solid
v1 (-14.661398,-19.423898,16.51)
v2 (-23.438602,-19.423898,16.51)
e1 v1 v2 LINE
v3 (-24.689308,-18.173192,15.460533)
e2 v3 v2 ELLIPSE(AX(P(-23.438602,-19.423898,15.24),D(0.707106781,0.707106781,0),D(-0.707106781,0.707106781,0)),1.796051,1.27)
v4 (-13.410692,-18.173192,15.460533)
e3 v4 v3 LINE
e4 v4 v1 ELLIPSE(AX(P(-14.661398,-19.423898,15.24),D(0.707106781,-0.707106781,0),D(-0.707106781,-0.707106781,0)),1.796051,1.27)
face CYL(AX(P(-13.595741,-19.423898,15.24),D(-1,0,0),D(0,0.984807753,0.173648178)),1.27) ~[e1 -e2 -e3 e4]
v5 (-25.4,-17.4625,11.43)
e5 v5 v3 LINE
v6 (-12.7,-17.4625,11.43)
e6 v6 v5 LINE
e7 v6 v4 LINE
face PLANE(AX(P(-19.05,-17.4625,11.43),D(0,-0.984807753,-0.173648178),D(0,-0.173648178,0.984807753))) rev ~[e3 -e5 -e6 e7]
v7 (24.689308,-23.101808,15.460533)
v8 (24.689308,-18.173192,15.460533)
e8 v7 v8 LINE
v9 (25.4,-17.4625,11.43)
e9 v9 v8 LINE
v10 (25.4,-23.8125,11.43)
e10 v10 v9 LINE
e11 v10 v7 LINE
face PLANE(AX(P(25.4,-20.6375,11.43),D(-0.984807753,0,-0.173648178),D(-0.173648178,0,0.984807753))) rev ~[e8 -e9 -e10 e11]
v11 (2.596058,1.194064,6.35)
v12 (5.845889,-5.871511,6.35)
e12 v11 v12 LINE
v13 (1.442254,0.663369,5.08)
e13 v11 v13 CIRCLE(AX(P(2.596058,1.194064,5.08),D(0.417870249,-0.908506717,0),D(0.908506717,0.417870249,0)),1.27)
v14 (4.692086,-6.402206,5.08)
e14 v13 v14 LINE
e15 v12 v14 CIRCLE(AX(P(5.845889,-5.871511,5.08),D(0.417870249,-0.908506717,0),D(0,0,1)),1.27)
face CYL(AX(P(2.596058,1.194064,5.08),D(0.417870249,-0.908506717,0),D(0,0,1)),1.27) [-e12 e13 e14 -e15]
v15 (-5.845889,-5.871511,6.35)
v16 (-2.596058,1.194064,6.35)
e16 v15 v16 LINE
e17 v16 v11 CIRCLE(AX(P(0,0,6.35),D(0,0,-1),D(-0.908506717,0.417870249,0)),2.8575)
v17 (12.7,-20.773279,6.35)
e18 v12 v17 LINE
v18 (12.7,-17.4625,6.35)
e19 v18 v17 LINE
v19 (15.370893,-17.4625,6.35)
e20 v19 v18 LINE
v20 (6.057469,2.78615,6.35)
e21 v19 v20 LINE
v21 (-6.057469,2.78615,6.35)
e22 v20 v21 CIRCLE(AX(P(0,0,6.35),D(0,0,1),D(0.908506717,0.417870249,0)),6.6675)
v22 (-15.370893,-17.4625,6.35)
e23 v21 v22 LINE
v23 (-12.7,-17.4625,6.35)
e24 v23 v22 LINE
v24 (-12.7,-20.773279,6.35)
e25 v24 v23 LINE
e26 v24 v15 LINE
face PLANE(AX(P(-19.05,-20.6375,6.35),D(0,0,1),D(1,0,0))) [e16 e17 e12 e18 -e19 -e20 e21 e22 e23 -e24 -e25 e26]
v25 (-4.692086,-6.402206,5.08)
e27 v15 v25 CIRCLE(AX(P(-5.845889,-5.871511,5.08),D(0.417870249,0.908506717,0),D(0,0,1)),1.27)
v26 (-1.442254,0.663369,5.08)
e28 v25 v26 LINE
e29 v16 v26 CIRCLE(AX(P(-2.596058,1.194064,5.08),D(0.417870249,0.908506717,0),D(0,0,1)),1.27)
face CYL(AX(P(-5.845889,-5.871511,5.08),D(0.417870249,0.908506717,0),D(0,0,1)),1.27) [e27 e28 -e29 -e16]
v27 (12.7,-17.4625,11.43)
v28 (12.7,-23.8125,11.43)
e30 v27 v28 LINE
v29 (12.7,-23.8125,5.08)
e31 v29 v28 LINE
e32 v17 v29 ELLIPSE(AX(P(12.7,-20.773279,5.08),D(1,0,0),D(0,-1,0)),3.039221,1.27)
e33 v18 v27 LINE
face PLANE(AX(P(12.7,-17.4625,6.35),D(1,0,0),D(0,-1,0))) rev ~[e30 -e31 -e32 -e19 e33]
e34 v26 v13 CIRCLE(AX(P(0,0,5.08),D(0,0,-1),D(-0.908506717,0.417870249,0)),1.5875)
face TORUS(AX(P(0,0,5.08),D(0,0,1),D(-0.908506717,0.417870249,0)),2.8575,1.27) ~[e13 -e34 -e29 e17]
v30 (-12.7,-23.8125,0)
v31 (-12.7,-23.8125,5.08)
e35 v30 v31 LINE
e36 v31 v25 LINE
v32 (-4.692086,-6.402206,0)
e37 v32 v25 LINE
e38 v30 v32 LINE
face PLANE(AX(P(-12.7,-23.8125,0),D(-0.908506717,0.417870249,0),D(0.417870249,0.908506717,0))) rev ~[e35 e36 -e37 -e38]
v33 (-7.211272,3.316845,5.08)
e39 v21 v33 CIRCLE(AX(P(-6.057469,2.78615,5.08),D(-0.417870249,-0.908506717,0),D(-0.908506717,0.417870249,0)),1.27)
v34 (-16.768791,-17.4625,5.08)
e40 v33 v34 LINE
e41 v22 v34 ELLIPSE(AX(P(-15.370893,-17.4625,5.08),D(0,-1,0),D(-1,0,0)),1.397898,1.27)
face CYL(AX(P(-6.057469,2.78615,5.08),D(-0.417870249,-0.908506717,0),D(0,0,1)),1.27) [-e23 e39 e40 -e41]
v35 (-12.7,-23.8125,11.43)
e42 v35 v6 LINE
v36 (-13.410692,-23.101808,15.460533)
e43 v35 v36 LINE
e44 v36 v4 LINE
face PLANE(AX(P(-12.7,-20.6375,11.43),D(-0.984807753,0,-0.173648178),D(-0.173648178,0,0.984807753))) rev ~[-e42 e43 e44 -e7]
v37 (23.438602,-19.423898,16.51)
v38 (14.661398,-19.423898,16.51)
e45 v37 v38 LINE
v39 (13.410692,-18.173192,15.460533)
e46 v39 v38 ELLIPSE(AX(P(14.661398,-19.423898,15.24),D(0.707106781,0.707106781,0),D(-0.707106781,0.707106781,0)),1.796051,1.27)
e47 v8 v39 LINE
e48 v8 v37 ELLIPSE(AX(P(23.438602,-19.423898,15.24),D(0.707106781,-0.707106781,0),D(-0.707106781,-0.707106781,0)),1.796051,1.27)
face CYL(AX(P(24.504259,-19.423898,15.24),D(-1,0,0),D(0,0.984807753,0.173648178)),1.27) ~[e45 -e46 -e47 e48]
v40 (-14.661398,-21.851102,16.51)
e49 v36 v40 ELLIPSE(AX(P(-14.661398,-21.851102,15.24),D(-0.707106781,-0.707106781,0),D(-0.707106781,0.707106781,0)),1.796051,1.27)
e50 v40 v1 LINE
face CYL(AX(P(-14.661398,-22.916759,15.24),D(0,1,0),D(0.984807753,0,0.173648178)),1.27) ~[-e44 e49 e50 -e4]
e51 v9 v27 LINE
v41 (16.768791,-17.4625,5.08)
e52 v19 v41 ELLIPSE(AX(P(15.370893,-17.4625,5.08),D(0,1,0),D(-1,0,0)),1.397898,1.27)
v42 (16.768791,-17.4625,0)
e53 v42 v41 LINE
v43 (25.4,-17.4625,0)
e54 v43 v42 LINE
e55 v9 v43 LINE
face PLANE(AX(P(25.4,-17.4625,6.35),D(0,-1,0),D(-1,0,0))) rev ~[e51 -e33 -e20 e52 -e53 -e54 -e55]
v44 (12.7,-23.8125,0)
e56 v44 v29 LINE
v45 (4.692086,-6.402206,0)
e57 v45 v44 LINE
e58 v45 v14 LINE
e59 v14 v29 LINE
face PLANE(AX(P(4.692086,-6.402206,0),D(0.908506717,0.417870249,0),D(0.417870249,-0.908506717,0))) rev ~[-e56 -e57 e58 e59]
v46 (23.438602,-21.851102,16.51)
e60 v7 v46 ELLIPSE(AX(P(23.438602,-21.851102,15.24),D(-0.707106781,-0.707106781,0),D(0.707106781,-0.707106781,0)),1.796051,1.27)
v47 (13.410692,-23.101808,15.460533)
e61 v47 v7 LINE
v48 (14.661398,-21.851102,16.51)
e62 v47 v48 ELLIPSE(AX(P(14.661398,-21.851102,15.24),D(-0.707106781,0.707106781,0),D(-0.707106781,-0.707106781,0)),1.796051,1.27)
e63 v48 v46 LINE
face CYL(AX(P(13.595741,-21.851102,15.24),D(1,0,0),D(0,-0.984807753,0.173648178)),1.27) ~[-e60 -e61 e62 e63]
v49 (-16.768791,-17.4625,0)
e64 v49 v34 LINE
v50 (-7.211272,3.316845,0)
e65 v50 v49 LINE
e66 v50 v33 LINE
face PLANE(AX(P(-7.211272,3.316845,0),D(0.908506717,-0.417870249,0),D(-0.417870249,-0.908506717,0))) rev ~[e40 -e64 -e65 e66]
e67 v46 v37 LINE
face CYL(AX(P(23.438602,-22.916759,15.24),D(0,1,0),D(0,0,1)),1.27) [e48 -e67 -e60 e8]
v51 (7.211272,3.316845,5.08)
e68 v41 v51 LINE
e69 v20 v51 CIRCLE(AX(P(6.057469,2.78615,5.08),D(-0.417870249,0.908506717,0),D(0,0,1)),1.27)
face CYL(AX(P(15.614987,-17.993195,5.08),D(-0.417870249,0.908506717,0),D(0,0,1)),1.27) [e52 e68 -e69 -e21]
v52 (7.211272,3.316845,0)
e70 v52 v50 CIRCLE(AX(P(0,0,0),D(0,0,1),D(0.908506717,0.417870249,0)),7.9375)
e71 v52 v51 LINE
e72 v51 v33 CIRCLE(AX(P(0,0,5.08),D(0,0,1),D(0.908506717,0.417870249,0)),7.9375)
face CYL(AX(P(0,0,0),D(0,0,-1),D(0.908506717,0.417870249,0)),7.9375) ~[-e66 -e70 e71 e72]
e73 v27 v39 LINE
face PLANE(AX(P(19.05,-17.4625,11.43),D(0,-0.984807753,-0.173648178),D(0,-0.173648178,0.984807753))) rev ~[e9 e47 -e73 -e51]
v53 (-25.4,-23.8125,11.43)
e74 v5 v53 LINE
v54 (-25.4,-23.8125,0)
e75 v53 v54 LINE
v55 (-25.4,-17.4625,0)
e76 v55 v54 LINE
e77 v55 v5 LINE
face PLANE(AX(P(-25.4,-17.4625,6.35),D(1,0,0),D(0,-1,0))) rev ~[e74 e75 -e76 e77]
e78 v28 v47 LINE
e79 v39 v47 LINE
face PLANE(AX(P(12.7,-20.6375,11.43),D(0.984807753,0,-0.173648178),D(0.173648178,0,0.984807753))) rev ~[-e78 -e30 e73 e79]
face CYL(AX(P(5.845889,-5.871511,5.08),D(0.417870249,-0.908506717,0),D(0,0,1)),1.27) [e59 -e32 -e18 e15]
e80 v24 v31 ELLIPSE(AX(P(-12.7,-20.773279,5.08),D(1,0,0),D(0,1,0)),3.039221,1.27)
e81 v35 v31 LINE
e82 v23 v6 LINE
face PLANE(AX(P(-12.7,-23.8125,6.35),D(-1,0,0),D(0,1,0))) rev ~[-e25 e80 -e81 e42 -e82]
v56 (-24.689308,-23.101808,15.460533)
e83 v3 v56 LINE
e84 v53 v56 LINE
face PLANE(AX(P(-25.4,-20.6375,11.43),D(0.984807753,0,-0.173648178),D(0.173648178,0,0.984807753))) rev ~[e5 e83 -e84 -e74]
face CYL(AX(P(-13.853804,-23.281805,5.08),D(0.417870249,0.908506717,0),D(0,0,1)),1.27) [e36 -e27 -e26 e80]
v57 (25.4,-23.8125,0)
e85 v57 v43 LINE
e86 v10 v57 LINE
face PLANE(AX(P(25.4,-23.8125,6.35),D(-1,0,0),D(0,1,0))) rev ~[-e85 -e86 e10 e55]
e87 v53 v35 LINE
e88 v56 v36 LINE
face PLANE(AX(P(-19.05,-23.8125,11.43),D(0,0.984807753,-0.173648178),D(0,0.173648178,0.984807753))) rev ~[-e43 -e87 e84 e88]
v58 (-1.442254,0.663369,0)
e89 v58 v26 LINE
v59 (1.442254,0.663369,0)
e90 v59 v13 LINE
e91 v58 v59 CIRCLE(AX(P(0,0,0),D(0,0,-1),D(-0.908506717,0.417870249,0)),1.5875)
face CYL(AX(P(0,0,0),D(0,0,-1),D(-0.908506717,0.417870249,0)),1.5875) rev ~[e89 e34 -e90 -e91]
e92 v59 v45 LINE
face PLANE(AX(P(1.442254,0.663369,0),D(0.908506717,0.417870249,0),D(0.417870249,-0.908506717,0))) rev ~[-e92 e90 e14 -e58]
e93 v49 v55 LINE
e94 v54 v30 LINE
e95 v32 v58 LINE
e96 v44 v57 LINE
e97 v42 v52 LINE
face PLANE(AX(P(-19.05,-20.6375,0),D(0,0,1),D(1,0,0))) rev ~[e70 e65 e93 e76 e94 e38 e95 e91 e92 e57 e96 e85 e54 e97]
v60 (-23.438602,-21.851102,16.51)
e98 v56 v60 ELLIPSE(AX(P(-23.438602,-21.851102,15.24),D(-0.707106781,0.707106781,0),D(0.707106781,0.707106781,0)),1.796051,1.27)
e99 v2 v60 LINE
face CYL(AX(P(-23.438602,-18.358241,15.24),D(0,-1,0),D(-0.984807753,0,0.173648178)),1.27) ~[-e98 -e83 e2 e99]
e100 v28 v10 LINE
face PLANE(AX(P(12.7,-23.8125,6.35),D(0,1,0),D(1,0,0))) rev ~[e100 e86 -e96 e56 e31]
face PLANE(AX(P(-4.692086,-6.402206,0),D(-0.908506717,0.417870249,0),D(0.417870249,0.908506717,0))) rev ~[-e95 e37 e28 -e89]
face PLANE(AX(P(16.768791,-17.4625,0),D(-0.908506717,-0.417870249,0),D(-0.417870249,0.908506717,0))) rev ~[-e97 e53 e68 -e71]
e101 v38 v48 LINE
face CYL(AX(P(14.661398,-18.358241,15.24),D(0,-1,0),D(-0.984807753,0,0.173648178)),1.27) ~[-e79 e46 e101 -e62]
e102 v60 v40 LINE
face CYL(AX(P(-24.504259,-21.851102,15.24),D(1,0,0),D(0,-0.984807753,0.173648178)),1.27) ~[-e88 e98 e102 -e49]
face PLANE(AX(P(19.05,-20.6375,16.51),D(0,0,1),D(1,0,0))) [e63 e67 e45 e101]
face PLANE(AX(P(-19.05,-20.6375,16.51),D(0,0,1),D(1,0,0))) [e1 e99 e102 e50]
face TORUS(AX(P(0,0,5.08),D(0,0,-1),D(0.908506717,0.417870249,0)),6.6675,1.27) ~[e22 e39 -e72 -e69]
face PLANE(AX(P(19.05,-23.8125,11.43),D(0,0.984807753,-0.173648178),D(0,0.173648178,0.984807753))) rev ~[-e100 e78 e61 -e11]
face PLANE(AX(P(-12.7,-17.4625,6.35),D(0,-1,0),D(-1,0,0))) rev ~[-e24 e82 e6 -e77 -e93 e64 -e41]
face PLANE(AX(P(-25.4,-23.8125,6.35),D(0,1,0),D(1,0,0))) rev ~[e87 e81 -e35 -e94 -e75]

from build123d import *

# Parameters (mm, degrees)
F2_DEPTH  = 6.35
F5_DEPTH  = 5.08
F5_FACE_W = 12.7
F5_FACE_H = 6.35
F6_DEPTH  = 5.08
F6_TAPER  = 10
F7_R      = 1.27


# Not quite as in the source:
# - a variable given as a bare number and used for a length is read in inches; the dataset says mm whatever the document's units were


with BuildPart() as f2:
    # F1 (on Top) → F2 (new body)
    with BuildSketch(Plane.XY):
        Polygon((-25.4, -23.8125), (-12.7, -23.8125), (-12.7, -17.4625), (-16.7687909609, -17.4625), (-25.4, -17.4625), align=None)
        with BuildLine():
            Line((-12.7, -23.8125), (-4.6920856358, -6.4022057634))
            ThreePointArc((-4.6920856358, -6.4022057634), (-7.6835843575, -1.991591743), (-7.2112720666, 3.3168451022))
            Line((-7.2112720666, 3.3168451022), (-16.7687909609, -17.4625))
            Line((-16.7687909609, -17.4625), (-12.7, -17.4625))
            Line((-12.7, -17.4625), (-12.7, -23.8125))
        make_face()
        with BuildLine():
            ThreePointArc((-1.4422544133, 0.6633690204), (0, 1.5875), (1.4422544133, 0.6633690204))
            Line((1.4422544133, 0.6633690204), (4.6920856358, -6.4022057634))
            ThreePointArc((4.6920856358, -6.4022057634), (7.079807059, -3.5889048828), (7.9375, 0))
            ThreePointArc((7.9375, 0), (7.7538177138, 1.6977093717), (7.2112720666, 3.3168451022))
            ThreePointArc((7.2112720666, 3.3168451022), (0, 7.9375), (-7.2112720666, 3.3168451022))
            ThreePointArc((-7.2112720666, 3.3168451022), (-7.6835843575, -1.991591743), (-4.6920856358, -6.4022057634))
            Line((-4.6920856358, -6.4022057634), (-1.4422544133, 0.6633690204))
        make_face()
        with BuildLine():
            ThreePointArc((7.9375, 0), (7.079807059, -3.5889048828), (4.6920856358, -6.4022057634))
            Line((4.6920856358, -6.4022057634), (12.7, -23.8125))
            Line((12.7, -23.8125), (12.7, -17.4625))
            Line((12.7, -17.4625), (16.7687909609, -17.4625))
            Line((16.7687909609, -17.4625), (7.2112720666, 3.3168451022))
            ThreePointArc((7.2112720666, 3.3168451022), (7.7538177138, 1.6977093717), (7.9375, 0))
        make_face()
        Polygon((12.7, -17.4625), (12.7, -23.8125), (25.4, -23.8125), (25.4, -17.4625), (16.7687909609, -17.4625), align=None)
    extrude(amount=F2_DEPTH)

    # F4 (on face) → F5 (join)
    with BuildSketch(Plane.XY.offset(6.35)):
        Polygon((-12.7, -23.8125), (-12.7, -17.4625), (-16.7687909609, -17.4625), (-25.4, -17.4625), (-25.4, -23.8125), align=None)
        Polygon((25.4, -17.4625), (16.7687909609, -17.4625), (12.7, -17.4625), (12.7, -23.8125), (25.4, -23.8125), align=None)
    extrude(amount=F5_DEPTH)

    # F5_face (on face) → F6 (join)
    with BuildSketch(Plane(origin=(19.05, -20.6375, 11.43), x_dir=(1, 0, 0), z_dir=(0, 0, 1))):
        Rectangle(F5_FACE_W, F5_FACE_H)
        with Locations((-38.1, 0)):
            Rectangle(F5_FACE_W, F5_FACE_H)
    extrude(amount=F6_DEPTH, taper=F6_TAPER)

    # F7
    f7_edges = [f2.edges().sort_by_distance(p)[0] for p in [
        (19.05, -18.358241, 16.51),
        (13.595741, -20.6375, 16.51),
        (19.05, -22.916759, 16.51),
        (24.504259, -20.6375, 16.51),
        (-19.05, -18.358241, 16.51),
        (-13.595741, -20.6375, 16.51),
        (-19.05, -22.916759, 16.51),
        (-24.504259, -20.6375, 16.51),
        (7.071127, -11.574565, 6.35),
        (-11.990032, -7.072827, 6.35),
    ]]
    fillet(f7_edges, radius=F7_R)


solid = f2.part
